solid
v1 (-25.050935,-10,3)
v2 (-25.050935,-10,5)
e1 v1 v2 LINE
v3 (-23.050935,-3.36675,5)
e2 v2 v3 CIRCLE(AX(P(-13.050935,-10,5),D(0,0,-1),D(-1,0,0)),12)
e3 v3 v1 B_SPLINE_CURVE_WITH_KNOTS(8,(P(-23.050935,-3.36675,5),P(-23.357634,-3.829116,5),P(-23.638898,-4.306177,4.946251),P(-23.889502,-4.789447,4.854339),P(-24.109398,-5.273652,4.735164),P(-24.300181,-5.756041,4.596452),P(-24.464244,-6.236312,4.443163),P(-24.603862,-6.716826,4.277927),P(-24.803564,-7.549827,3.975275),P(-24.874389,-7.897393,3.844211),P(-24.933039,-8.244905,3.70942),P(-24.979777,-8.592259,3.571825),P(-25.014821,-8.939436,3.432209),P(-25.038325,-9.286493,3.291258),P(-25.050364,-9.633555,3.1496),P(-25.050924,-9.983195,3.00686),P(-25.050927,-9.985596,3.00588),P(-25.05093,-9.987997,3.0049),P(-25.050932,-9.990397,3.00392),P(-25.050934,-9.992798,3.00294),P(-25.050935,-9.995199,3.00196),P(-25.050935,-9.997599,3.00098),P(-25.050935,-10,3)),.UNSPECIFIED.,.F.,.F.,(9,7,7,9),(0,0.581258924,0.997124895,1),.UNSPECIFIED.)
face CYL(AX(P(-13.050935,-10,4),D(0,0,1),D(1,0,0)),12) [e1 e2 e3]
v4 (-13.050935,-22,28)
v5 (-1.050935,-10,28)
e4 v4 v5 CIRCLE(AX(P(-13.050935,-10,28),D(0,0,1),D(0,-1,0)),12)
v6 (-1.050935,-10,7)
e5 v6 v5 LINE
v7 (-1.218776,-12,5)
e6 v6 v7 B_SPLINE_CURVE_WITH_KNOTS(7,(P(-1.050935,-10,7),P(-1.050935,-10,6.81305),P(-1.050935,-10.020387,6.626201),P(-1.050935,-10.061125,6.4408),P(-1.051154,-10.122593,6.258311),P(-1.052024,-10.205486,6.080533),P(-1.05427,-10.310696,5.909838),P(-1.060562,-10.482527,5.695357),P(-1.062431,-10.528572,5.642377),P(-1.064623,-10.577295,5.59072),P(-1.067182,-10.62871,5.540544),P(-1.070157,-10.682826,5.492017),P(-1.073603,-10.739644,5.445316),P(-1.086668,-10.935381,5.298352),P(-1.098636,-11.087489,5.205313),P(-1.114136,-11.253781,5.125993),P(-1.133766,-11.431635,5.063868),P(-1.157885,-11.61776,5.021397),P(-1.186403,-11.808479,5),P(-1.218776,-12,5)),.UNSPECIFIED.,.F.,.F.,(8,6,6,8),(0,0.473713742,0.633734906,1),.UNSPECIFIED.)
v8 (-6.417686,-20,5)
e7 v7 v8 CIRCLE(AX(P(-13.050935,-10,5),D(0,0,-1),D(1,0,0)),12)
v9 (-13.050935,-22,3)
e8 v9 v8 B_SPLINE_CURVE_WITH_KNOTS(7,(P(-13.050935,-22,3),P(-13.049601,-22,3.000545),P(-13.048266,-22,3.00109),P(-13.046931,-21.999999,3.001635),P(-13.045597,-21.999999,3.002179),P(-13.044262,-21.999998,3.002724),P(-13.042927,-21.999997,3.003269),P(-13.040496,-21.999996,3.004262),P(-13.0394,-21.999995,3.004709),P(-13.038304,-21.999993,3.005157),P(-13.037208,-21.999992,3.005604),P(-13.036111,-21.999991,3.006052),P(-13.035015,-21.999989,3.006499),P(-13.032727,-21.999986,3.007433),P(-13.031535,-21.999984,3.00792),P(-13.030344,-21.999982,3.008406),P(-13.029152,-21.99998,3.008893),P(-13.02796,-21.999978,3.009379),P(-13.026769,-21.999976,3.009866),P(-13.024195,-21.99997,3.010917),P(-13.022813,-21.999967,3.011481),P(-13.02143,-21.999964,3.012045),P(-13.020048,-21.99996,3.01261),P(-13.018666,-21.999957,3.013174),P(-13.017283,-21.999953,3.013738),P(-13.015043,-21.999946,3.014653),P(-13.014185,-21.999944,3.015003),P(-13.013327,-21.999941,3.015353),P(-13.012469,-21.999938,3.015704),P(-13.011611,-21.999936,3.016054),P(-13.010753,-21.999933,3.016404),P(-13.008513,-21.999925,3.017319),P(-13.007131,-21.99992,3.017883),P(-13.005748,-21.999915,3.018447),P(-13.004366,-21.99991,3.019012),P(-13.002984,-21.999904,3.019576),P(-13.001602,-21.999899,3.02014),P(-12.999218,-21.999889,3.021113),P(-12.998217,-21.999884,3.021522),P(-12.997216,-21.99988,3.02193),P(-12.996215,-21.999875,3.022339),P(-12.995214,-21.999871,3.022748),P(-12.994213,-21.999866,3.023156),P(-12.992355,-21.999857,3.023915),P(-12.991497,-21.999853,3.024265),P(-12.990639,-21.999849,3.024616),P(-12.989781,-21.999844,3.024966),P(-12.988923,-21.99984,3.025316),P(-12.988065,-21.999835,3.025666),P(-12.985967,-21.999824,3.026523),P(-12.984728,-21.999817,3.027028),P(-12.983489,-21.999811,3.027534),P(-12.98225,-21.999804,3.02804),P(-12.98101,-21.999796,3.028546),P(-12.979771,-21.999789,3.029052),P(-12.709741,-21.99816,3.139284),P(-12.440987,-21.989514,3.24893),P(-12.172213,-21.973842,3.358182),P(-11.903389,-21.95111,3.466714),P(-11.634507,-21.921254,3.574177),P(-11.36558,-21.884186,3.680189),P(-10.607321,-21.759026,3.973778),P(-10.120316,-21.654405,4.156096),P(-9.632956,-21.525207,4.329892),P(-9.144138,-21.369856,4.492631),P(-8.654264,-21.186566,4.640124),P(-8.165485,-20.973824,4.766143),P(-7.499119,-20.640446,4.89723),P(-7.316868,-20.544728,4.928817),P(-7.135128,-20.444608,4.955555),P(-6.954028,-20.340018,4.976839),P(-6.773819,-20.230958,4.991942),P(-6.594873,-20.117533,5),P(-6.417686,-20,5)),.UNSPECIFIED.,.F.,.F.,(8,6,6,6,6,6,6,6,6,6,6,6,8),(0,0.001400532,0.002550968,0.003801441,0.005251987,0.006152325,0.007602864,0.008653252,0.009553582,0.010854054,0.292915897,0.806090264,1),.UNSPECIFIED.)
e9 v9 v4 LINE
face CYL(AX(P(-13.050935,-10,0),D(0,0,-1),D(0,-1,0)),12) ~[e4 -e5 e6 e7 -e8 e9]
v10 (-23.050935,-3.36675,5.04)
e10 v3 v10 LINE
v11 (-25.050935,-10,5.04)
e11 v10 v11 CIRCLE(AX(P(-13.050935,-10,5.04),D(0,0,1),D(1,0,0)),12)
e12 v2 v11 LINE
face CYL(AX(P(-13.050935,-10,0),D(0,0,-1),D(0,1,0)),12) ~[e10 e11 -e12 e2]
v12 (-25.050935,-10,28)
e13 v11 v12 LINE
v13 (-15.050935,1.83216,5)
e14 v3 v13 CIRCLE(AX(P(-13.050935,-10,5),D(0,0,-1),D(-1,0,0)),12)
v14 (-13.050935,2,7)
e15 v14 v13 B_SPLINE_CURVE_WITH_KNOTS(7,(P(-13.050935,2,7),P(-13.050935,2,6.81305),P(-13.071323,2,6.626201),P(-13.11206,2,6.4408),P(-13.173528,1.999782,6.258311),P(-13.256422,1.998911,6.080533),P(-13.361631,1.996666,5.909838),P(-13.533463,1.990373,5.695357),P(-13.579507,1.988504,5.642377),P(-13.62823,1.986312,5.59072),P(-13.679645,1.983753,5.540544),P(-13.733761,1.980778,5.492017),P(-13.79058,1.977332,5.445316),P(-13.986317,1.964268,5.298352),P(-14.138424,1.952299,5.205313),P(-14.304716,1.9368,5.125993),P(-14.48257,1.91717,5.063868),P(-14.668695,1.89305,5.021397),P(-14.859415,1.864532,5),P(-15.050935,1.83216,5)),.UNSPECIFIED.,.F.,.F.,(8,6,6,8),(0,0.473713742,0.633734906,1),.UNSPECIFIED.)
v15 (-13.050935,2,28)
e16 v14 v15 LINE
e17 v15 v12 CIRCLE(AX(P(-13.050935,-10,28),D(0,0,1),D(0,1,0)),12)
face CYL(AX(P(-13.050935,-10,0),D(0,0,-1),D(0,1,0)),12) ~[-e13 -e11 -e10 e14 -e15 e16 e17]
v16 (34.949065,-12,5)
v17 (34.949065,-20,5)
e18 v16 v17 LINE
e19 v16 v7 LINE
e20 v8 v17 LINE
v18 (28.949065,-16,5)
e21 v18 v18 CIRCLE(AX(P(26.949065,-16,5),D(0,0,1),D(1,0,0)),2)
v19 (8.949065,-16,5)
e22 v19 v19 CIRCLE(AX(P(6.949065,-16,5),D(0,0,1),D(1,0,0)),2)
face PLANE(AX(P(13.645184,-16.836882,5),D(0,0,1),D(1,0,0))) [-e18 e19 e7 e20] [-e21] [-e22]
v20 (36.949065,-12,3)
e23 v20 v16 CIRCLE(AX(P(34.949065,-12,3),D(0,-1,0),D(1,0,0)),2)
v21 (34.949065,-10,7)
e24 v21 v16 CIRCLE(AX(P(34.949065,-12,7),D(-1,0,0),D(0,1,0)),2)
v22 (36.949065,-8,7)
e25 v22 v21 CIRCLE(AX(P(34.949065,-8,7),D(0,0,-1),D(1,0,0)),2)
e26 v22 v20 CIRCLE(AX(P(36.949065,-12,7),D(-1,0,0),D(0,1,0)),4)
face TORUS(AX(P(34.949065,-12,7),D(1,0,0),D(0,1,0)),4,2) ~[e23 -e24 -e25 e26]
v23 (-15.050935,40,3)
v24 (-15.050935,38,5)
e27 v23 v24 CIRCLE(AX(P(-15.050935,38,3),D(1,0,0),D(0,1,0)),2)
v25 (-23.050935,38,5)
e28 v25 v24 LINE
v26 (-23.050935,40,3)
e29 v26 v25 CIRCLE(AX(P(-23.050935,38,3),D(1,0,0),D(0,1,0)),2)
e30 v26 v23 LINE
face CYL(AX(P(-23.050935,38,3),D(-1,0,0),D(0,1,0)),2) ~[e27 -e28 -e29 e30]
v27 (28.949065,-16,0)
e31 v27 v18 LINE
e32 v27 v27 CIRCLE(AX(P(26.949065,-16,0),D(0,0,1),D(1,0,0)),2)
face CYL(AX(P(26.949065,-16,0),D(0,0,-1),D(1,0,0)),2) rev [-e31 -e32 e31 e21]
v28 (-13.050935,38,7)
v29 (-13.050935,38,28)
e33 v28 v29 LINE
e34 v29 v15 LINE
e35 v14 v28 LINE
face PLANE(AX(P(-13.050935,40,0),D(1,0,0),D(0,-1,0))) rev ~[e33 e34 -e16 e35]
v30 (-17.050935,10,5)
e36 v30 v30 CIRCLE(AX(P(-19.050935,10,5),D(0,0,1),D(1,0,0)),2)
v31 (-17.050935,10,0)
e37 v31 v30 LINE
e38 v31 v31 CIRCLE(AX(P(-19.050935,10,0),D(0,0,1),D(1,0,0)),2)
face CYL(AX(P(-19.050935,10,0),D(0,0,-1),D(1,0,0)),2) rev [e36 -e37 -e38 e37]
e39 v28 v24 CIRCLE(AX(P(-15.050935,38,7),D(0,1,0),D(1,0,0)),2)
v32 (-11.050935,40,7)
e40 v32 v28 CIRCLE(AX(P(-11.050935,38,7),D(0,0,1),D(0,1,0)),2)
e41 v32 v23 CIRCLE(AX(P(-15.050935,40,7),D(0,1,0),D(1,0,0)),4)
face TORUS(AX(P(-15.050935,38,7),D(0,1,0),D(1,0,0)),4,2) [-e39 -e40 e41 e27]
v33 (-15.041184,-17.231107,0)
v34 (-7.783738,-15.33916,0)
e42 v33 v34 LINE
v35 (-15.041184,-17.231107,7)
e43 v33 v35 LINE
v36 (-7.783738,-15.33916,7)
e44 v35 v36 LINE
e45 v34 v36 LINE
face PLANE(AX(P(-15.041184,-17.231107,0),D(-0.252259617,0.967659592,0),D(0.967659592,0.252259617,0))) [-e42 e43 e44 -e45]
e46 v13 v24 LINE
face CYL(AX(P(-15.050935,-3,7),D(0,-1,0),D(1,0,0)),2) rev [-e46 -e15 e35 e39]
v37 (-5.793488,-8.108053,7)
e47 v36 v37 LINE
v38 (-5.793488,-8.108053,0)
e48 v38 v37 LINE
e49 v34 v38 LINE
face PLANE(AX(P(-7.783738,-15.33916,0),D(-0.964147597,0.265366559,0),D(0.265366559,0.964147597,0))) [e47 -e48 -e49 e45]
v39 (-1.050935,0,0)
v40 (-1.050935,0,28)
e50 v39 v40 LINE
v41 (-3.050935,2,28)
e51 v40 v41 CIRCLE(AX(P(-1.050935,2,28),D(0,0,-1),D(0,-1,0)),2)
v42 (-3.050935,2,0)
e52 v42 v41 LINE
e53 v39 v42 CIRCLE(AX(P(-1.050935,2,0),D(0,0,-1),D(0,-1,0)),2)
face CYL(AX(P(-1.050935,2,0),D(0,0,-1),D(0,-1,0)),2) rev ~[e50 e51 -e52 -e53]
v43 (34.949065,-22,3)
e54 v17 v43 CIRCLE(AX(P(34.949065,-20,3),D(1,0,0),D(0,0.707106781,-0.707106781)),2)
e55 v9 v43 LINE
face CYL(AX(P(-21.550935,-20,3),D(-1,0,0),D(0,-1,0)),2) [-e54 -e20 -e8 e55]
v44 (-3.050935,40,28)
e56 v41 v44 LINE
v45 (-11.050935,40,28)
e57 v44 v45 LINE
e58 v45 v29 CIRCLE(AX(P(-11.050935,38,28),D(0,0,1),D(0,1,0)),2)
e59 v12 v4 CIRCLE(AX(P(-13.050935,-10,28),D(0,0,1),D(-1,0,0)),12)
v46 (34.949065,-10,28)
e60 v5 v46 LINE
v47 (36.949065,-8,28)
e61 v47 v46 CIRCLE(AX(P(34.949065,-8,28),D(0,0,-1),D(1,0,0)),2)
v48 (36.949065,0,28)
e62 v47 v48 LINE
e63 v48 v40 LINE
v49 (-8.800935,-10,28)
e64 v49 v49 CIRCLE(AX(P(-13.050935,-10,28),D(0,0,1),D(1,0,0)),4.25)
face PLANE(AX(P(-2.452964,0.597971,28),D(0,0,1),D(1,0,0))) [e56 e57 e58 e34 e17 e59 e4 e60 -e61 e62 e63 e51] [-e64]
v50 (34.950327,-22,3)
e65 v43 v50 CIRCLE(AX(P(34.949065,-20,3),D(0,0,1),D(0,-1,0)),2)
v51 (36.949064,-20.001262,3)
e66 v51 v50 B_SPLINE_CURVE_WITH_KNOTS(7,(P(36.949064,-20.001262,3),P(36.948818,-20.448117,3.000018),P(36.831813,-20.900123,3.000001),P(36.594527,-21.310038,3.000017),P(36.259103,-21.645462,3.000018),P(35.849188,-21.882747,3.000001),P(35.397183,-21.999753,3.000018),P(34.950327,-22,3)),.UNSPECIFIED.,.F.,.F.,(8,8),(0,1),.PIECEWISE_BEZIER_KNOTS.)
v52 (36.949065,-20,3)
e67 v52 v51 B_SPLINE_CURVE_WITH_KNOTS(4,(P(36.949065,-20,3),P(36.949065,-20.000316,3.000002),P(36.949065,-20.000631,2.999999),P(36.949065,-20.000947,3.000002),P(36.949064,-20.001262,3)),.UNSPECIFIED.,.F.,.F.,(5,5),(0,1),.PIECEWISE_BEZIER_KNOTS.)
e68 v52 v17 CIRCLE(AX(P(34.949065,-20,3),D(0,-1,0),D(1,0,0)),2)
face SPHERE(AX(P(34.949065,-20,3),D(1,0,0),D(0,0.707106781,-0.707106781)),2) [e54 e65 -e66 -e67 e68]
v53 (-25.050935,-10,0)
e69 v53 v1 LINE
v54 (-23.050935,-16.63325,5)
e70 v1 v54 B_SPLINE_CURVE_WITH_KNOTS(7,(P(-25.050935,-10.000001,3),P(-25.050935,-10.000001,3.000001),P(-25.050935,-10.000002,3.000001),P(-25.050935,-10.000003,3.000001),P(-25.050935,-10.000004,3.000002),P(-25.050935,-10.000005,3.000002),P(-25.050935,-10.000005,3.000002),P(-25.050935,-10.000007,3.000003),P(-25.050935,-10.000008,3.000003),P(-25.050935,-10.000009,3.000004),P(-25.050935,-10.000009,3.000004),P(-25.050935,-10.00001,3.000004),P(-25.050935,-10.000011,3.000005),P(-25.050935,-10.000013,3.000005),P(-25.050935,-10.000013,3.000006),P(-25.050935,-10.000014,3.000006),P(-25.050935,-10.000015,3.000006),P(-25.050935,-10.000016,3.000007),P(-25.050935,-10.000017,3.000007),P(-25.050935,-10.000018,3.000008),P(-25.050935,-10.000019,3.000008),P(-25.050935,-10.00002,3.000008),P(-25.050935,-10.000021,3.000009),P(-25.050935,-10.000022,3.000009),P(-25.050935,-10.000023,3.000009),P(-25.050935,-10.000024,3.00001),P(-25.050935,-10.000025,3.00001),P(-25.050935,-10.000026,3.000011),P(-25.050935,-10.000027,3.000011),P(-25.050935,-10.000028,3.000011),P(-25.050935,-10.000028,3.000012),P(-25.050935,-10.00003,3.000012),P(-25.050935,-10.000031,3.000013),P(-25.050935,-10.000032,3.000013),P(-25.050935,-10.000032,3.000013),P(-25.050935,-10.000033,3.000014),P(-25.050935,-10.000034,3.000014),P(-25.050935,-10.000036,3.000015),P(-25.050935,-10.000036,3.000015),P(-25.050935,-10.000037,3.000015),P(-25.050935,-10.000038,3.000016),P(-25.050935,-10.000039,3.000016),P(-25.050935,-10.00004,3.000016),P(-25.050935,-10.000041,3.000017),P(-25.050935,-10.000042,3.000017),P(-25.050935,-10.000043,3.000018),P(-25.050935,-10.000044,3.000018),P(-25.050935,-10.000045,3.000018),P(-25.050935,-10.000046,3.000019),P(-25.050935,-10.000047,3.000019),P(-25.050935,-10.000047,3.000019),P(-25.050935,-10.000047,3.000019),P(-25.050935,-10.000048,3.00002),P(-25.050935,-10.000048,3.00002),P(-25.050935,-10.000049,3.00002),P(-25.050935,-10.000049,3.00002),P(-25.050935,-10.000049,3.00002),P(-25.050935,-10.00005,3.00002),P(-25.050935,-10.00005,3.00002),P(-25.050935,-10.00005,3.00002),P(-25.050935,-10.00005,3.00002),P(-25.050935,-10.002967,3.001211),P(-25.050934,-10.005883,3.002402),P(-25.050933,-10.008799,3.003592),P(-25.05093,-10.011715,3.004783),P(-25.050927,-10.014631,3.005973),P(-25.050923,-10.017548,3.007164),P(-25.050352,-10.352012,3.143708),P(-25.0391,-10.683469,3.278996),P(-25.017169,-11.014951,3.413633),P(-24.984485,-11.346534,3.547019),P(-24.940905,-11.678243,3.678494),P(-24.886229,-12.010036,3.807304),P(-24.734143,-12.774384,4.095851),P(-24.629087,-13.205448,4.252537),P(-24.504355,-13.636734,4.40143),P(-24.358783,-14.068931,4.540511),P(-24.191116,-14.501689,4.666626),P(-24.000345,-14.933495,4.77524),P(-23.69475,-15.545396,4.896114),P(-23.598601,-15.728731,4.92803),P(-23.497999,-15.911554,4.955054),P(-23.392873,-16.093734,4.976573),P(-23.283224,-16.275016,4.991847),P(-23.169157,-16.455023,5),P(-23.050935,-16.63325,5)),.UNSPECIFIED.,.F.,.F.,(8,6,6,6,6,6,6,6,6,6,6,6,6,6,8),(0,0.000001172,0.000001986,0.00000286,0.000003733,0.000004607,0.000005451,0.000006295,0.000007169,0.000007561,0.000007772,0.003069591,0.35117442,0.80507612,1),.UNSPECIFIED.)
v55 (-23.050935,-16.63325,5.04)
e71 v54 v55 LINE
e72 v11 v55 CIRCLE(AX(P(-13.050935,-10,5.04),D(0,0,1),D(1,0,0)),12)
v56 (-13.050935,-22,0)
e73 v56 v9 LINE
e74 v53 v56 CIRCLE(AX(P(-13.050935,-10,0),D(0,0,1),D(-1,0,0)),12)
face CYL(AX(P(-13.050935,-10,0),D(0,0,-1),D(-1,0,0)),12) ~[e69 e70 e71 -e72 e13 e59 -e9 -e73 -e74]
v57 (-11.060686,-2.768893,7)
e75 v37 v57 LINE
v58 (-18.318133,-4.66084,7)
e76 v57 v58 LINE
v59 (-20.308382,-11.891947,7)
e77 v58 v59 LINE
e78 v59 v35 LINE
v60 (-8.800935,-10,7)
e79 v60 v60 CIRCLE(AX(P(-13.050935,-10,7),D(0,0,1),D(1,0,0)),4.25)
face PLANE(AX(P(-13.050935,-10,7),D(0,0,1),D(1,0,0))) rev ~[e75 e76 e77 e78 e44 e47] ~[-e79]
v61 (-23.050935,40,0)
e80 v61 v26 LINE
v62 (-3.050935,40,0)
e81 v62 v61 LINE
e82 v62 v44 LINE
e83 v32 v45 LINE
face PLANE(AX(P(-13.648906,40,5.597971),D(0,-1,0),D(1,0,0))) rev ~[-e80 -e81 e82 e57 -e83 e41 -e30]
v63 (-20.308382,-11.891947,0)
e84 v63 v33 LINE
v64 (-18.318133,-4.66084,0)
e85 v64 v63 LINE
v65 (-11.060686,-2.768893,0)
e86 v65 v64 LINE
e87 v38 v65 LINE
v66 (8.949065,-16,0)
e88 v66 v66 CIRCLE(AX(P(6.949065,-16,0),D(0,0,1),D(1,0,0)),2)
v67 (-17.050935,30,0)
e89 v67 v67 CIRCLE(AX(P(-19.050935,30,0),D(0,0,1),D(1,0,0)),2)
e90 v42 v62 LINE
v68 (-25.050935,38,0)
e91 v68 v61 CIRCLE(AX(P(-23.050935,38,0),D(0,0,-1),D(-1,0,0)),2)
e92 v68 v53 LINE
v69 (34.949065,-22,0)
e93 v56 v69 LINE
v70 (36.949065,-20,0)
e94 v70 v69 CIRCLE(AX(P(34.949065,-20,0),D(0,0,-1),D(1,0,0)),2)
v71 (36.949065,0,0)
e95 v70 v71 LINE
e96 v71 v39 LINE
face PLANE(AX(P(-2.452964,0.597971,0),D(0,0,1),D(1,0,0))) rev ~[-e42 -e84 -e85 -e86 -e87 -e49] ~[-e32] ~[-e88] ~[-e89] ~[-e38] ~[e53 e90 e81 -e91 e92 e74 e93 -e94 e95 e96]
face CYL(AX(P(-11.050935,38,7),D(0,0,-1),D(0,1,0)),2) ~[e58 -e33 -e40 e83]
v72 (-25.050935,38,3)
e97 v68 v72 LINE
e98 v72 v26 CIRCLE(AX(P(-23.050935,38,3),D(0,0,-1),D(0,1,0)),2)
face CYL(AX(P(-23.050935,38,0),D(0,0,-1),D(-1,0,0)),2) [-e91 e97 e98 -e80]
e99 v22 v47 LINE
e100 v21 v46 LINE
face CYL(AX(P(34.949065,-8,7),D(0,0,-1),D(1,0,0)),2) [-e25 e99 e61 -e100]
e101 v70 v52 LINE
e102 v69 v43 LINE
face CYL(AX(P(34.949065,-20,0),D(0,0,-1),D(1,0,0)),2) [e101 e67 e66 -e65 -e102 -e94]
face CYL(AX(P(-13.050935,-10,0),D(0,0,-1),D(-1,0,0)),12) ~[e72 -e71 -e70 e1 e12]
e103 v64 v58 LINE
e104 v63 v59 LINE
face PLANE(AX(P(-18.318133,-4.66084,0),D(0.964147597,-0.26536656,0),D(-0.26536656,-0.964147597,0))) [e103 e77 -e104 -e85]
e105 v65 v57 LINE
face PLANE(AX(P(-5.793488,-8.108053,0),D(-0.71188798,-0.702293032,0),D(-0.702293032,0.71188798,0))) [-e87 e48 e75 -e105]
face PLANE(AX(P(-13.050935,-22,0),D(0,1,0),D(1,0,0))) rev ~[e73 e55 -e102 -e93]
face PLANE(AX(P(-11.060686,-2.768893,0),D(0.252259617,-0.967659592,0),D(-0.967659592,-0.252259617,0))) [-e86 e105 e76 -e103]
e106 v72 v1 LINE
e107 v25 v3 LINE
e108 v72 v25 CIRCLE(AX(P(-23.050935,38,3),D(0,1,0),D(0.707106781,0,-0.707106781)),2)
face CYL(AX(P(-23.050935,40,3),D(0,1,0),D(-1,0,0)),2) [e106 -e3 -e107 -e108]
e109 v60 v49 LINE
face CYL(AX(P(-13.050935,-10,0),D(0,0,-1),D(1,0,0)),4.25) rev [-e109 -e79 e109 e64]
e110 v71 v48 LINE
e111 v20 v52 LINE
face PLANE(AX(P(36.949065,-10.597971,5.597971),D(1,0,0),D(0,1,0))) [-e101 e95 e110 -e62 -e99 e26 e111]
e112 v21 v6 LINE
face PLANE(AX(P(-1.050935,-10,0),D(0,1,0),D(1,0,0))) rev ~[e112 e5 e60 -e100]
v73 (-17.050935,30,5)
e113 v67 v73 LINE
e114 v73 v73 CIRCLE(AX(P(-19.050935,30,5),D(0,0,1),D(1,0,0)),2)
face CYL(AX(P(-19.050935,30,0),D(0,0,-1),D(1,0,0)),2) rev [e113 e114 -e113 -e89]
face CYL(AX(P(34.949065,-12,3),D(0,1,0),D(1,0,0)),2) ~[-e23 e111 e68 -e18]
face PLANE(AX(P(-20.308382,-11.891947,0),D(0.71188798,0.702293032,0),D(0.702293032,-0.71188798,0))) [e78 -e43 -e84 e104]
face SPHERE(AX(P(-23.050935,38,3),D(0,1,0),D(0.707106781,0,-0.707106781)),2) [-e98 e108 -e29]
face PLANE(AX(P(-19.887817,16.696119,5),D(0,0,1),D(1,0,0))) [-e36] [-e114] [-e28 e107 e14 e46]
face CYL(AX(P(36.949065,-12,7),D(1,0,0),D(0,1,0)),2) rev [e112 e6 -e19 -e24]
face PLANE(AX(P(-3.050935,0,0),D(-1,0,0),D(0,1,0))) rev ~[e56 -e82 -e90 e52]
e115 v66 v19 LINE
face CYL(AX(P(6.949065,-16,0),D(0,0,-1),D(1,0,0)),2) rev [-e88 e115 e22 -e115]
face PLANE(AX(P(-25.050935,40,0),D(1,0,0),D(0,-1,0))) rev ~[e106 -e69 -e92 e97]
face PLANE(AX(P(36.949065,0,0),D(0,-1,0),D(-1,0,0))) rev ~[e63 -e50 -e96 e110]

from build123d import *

# Parameters (mm, degrees)
F1_DEPTH     = 28
F0_R         = 2
F2_DEPTH     = 5
F3_DEPTH     = 5
F0_R_2       = 4.25
F4_DEPTH     = 28
F5_DEPTH     = 7
F6_T1_DEPTH  = 28
F6_T6_DEPTH  = 43
F6_S7_R      = 12
F6_T8_DEPTH  = 23
F6_T12_DEPTH = 43
F6_S13_R     = 12
F6_T14_DEPTH = 23
F6_T15_DEPTH = 5
F6_T20_DEPTH = 58.5
F6_S21_R     = 12
F6_T22_DEPTH = 31
F6_T26_DEPTH = 58.5
F6_S27_R     = 12
F6_T28_DEPTH = 31
F6_T33_DEPTH = 10
F6_T37_DEPTH = 63.5
F6_T44_DEPTH = 10
F6_T48_DEPTH = 63.5
F6_T51_DEPTH = 21
F6_T53_DEPTH = 8
F6_T55_DEPTH = 8
F6_S59_W     = 2.04
F6_S59_H     = 2.04
F6_T60_DEPTH = 2.04
F6_S65_W     = 2.04
F6_S65_H     = 2.04
F6_T66_DEPTH = 2.04
F6_T70_ANGLE = 90
F6_T72_ANGLE = 90


# Not quite as in the source:
# - a fillet or chamfer that OpenCascade refuses, or shapes differently, is made with other operations: its cross-section is extruded or revolved along the edge and cut away or added


with BuildPart() as f1:
    # F0 (on Top) → F1 (new body)
    with BuildSketch(Plane.XY):
        with BuildLine():
            Line((36.9490647506, 0), (-3.0509352494, 0))
            Line((-3.0509352494, 0), (-3.0509352494, 40))
            Line((-3.0509352494, 40), (-13.0509352494, 40))
            Line((-13.0509352494, 40), (-13.0509352494, 2))
            ThreePointArc((-13.0509352494, 2), (-21.5362166237, -1.5147186258), (-25.0509352494, -10))
            ThreePointArc((-25.0509352494, -10), (-21.5362166237, -18.4852813742), (-13.0509352494, -22))
            ThreePointArc((-13.0509352494, -22), (-4.5656538752, -18.4852813742), (-1.0509352494, -10))
            Line((-1.0509352494, -10), (36.9490647506, -10))
            Line((36.9490647506, -10), (36.9490647506, 0))
        make_face()
        Polygon((-5.7934883103, -8.1080528744), (-7.7837375065, -15.3391598531), (-15.0411844456, -17.2311069787), (-20.3083821886, -11.8919471256), (-18.3181329923, -4.6608401469), (-11.0606860532, -2.7688930213), align=None, mode=Mode.SUBTRACT)
    extrude(amount=F1_DEPTH)

    # F0 (on Top) → F2 (join)
    with BuildSketch(Plane.XY):
        with BuildLine():
            Line((-13.0509352494, 2), (-13.0509352494, 40))
            Line((-13.0509352494, 40), (-25.0509352494, 40))
            Line((-25.0509352494, 40), (-25.0509352494, -10))
            ThreePointArc((-25.0509352494, -10), (-21.5362166237, -1.5147186258), (-13.0509352494, 2))
        make_face()
        with Locations((-19.0509352494, 10)):
            Circle(F0_R, mode=Mode.SUBTRACT)
        with Locations((-19.0509352494, 30)):
            Circle(F0_R, mode=Mode.SUBTRACT)
    extrude(amount=F2_DEPTH)

    # F0 (on Top) → F3 (join)
    with BuildSketch(Plane.XY):
        with BuildLine():
            Line((36.9490647506, -22), (36.9490647506, -10))
            Line((36.9490647506, -10), (-1.0509352494, -10))
            ThreePointArc((-1.0509352494, -10), (-4.5656538752, -18.4852813742), (-13.0509352494, -22))
            Line((-13.0509352494, -22), (36.9490647506, -22))
        make_face()
        with Locations((6.9490647506, -16)):
            Circle(F0_R, mode=Mode.SUBTRACT)
        with Locations((26.9490647506, -16)):
            Circle(F0_R, mode=Mode.SUBTRACT)
    extrude(amount=F3_DEPTH)

    # F0 (on Top) → F4 (join)
    with BuildSketch(Plane.XY):
        Polygon((-15.0411844456, -17.2311069787), (-7.7837375065, -15.3391598531), (-5.7934883103, -8.1080528744), (-11.0606860532, -2.7688930213), (-18.3181329923, -4.6608401469), (-20.3083821886, -11.8919471256), align=None)
        with Locations((-13.0509352494, -10)):
            Circle(F0_R_2, mode=Mode.SUBTRACT)
    extrude(amount=F4_DEPTH)

    # F0 (on Top) → F5 (cut)
    with BuildSketch(Plane.XY):
        Polygon((-15.0411844456, -17.2311069787), (-7.7837375065, -15.3391598531), (-5.7934883103, -8.1080528744), (-11.0606860532, -2.7688930213), (-18.3181329923, -4.6608401469), (-20.3083821886, -11.8919471256), align=None)
        with Locations((-13.0509352494, -10)):
            Circle(F0_R_2, mode=Mode.SUBTRACT)
    extrude(amount=F5_DEPTH, mode=Mode.SUBTRACT)

    # F6: fillet of radius 2 on 11 edges, made by hand

    # F6_s2 → F6_t1 (join)
    with BuildSketch(Plane.XY):
        with BuildLine():
            ThreePointArc((-1.0509352494, 0), (-2.4651488118, 0.5857864376), (-3.0509352494, 2))
            Line((-3.0509352494, 2), (-3.0909352494, 2))
            Line((-3.0909352494, 2), (-3.0909352494, -0.04))
            Line((-3.0909352494, -0.04), (-1.0509352494, -0.04))
            Line((-1.0509352494, -0.04), (-1.0509352494, 0))
        make_face()
    extrude(amount=F6_T1_DEPTH)


with BuildPart() as f6_tool4:
    # F6_s5 → F6_t6 (new body)
    with BuildSketch(Plane.YZ.offset(36.9490647506)):
        with BuildLine():
            ThreePointArc((-10, 7), (-10.5857864376, 5.5857864376), (-12, 5))
            Line((-12, 5), (-12, 4.96))
            Line((-12, 4.96), (-9.96, 4.96))
            Line((-9.96, 4.96), (-9.96, 7))
            Line((-9.96, 7), (-10, 7))
        make_face()
    extrude(amount=-F6_T6_DEPTH)

    # F6_s7 → F6_t8 (cut, symmetric)
    with BuildSketch(Plane.XY.offset(6)):
        with Locations((-13.0509352494, -10)):
            Circle(F6_S7_R)
    extrude(amount=F6_T8_DEPTH, both=True, mode=Mode.SUBTRACT)


with BuildPart() as f1_1:
    add(f1.part)

    # F6_t3: union F6_tool4
    add(f6_tool4.part)


with BuildPart() as f6_tool10:
    # F6_s11 → F6_t12 (new body)
    with BuildSketch(Plane.XZ.offset(3)):
        with BuildLine():
            ThreePointArc((-13.0509352494, 7), (-13.6367216871, 5.5857864376), (-15.0509352494, 5))
            Line((-15.0509352494, 5), (-15.0509352494, 4.96))
            Line((-15.0509352494, 4.96), (-13.0109352494, 4.96))
            Line((-13.0109352494, 4.96), (-13.0109352494, 7))
            Line((-13.0109352494, 7), (-13.0509352494, 7))
        make_face()
    extrude(amount=-F6_T12_DEPTH)

    # F6_s13 → F6_t14 (cut, symmetric)
    with BuildSketch(Plane.XY.offset(6)):
        with Locations((-13.0509352494, -10)):
            Circle(F6_S13_R)
    extrude(amount=F6_T14_DEPTH, both=True, mode=Mode.SUBTRACT)


with BuildPart() as f1_2:
    add(f1_1.part)

    # F6_t9: union F6_tool10
    add(f6_tool10.part)

    # F6_s16 → F6_t15 (cut)
    with BuildSketch(Plane.XY):
        with BuildLine():
            ThreePointArc((36.9490647506, -20), (36.3632783129, -21.4142135624), (34.9490647506, -22))
            Line((34.9490647506, -22), (34.9490647506, -22.04))
            Line((34.9490647506, -22.04), (36.9890647506, -22.04))
            Line((36.9890647506, -22.04), (36.9890647506, -20))
            Line((36.9890647506, -20), (36.9490647506, -20))
        make_face()
        with BuildLine():
            ThreePointArc((-25.0509352494, 38), (-24.4651488118, 39.4142135624), (-23.0509352494, 40))
            Line((-23.0509352494, 40), (-23.0509352494, 40.04))
            Line((-23.0509352494, 40.04), (-25.0909352494, 40.04))
            Line((-25.0909352494, 40.04), (-25.0909352494, 38))
            Line((-25.0909352494, 38), (-25.0509352494, 38))
        make_face()
    extrude(amount=F6_T15_DEPTH, mode=Mode.SUBTRACT)


with BuildPart() as f6_tool18:
    # F6_s19 → F6_t20 (new body)
    with BuildSketch(Plane.YZ.offset(-21.5509352494)):
        with BuildLine():
            ThreePointArc((-22, 3), (-21.4142135624, 4.4142135624), (-20, 5))
            Line((-20, 5), (-20, 5.04))
            Line((-20, 5.04), (-22.04, 5.04))
            Line((-22.04, 5.04), (-22.04, 3))
            Line((-22.04, 3), (-22, 3))
        make_face()
    extrude(amount=F6_T20_DEPTH)

    # F6_s21 → F6_t22 (cut, symmetric)
    with BuildSketch(Plane.XY.offset(4)):
        with Locations((-13.0509352494, -10)):
            Circle(F6_S21_R)
    extrude(amount=F6_T22_DEPTH, both=True, mode=Mode.SUBTRACT)


with BuildPart() as f1_3:
    add(f1_2.part)

    # F6_t17: cut F6_tool18
    add(f6_tool18.part, mode=Mode.SUBTRACT)


with BuildPart() as f6_tool24:
    # F6_s25 → F6_t26 (new body)
    with BuildSketch(Plane.XZ.offset(-40)):
        with BuildLine():
            ThreePointArc((-25.0509352494, 3), (-24.4651488118, 4.4142135624), (-23.0509352494, 5))
            Line((-23.0509352494, 5), (-23.0509352494, 5.04))
            Line((-23.0509352494, 5.04), (-25.0909352494, 5.04))
            Line((-25.0909352494, 5.04), (-25.0909352494, 3))
            Line((-25.0909352494, 3), (-25.0509352494, 3))
        make_face()
    extrude(amount=F6_T26_DEPTH)

    # F6_s27 → F6_t28 (cut, symmetric)
    with BuildSketch(Plane.XY.offset(4)):
        with Locations((-13.0509352494, -10)):
            Circle(F6_S27_R)
    extrude(amount=F6_T28_DEPTH, both=True, mode=Mode.SUBTRACT)


with BuildPart() as f1_4:
    add(f1_3.part)

    # F6_t23: cut F6_tool24
    add(f6_tool24.part, mode=Mode.SUBTRACT)


with BuildPart() as f6_tool31:
    # F6_s32 → F6_t33 (new body)
    with BuildSketch(Plane.XY):
        with BuildLine():
            ThreePointArc((36.9490647506, -20), (36.3632783129, -21.4142135624), (34.9490647506, -22))
            Line((34.9490647506, -22), (34.9490647506, -22.04))
            Line((34.9490647506, -22.04), (36.9890647506, -22.04))
            Line((36.9890647506, -22.04), (36.9890647506, -20))
            Line((36.9890647506, -20), (36.9490647506, -20))
        make_face()
    extrude(amount=F6_T33_DEPTH)

    split(bisect_by=Plane.XY.offset(5), keep=Keep.TOP)


with BuildPart() as f6_tool35:
    # F6_s36 → F6_t37 (new body)
    with BuildSketch(Plane.YZ.offset(-21.5509352494)):
        with BuildLine():
            ThreePointArc((-22, 3), (-21.4142135624, 4.4142135624), (-20, 5))
            Line((-20, 5), (-20, 5.04))
            Line((-20, 5.04), (-22.04, 5.04))
            Line((-22.04, 5.04), (-22.04, 3))
            Line((-22.04, 3), (-22, 3))
        make_face()
    extrude(amount=F6_T37_DEPTH)

    split(bisect_by=Plane.YZ.offset(36.9490647506), keep=Keep.TOP)


with BuildPart() as f6_tool31_1:
    add(f6_tool31.part)

    # F6_t39: intersect F6_tool35
    add(f6_tool35.part, mode=Mode.INTERSECT)


with BuildPart() as f1_5:
    add(f1_4.part)

    # F6_t29: cut F6_tool31
    add(f6_tool31_1.part, mode=Mode.SUBTRACT)


with BuildPart() as f6_tool42:
    # F6_s43 → F6_t44 (new body)
    with BuildSketch(Plane.XY):
        with BuildLine():
            ThreePointArc((-25.0509352494, 38), (-24.4651488118, 39.4142135624), (-23.0509352494, 40))
            Line((-23.0509352494, 40), (-23.0509352494, 40.04))
            Line((-23.0509352494, 40.04), (-25.0909352494, 40.04))
            Line((-25.0909352494, 40.04), (-25.0909352494, 38))
            Line((-25.0909352494, 38), (-25.0509352494, 38))
        make_face()
    extrude(amount=F6_T44_DEPTH)

    split(bisect_by=Plane.XY.offset(5), keep=Keep.TOP)


with BuildPart() as f6_tool46:
    # F6_s47 → F6_t48 (new body)
    with BuildSketch(Plane.XZ.offset(-45)):
        with BuildLine():
            ThreePointArc((-25.0509352494, 3), (-24.4651488118, 4.4142135624), (-23.0509352494, 5))
            Line((-23.0509352494, 5), (-23.0509352494, 5.04))
            Line((-23.0509352494, 5.04), (-25.0909352494, 5.04))
            Line((-25.0909352494, 5.04), (-25.0909352494, 3))
            Line((-25.0909352494, 3), (-25.0509352494, 3))
        make_face()
    extrude(amount=F6_T48_DEPTH)

    split(bisect_by=Plane.XZ.offset(-40), keep=Keep.BOTTOM)


with BuildPart() as f6_tool42_1:
    add(f6_tool42.part)

    # F6_t50: intersect F6_tool46
    add(f6_tool46.part, mode=Mode.INTERSECT)


with BuildPart() as f1_6:
    add(f1_5.part)

    # F6_t40: cut F6_tool42
    add(f6_tool42_1.part, mode=Mode.SUBTRACT)

    # F6_s52 → F6_t51 (cut)
    with BuildSketch(Plane.XY.offset(7)):
        with BuildLine():
            ThreePointArc((36.9490647506, -8), (36.3632783129, -9.4142135624), (34.9490647506, -10))
            Line((34.9490647506, -10), (34.9490647506, -10.04))
            Line((34.9490647506, -10.04), (36.9890647506, -10.04))
            Line((36.9890647506, -10.04), (36.9890647506, -8))
            Line((36.9890647506, -8), (36.9490647506, -8))
        make_face()
        with BuildLine():
            ThreePointArc((-11.0509352494, 40), (-12.4651488118, 39.4142135624), (-13.0509352494, 38))
            Line((-13.0509352494, 38), (-13.0909352494, 38))
            Line((-13.0909352494, 38), (-13.0909352494, 40.04))
            Line((-13.0909352494, 40.04), (-11.0509352494, 40.04))
            Line((-11.0509352494, 40.04), (-11.0509352494, 40))
        make_face()
    extrude(amount=F6_T51_DEPTH, mode=Mode.SUBTRACT)

    # F6_s54 → F6_t53 (cut)
    with BuildSketch(Plane.XZ.offset(12)):
        with BuildLine():
            ThreePointArc((36.9490647506, 3), (36.3632783129, 4.4142135624), (34.9490647506, 5))
            Line((34.9490647506, 5), (34.9490647506, 5.04))
            Line((34.9490647506, 5.04), (36.9890647506, 5.04))
            Line((36.9890647506, 5.04), (36.9890647506, 3))
            Line((36.9890647506, 3), (36.9490647506, 3))
        make_face()
    extrude(amount=F6_T53_DEPTH, mode=Mode.SUBTRACT)

    # F6_s56 → F6_t55 (cut)
    with BuildSketch(Plane.YZ.offset(-23.0509352494)):
        with BuildLine():
            ThreePointArc((40, 3), (39.4142135624, 4.4142135624), (38, 5))
            Line((38, 5), (38, 5.04))
            Line((38, 5.04), (40.04, 5.04))
            Line((40.04, 5.04), (40.04, 3))
            Line((40.04, 3), (40, 3))
        make_face()
    extrude(amount=F6_T55_DEPTH, mode=Mode.SUBTRACT)


with BuildPart() as f6_tool58:
    # F6_s59 → F6_t60 (new body)
    with BuildSketch(Plane.XZ.offset(-38)):
        with Locations((-24.0709352494, 4.02)):
            Rectangle(F6_S59_W, F6_S59_H)
    extrude(amount=-F6_T60_DEPTH)

    # F6_s61 → F6_t62 (revolve, cut)
    with BuildSketch(Plane(origin=(-23.0509352494, 38, 3), x_dir=(0.7071067812, 0, -0.7071067812), z_dir=(0.7071067812, 0, 0.7071067812))):
        with BuildLine():
            ThreePointArc((0, -2), (2, 0), (0, 2))
            Line((0, 2), (0, -2))
        make_face()
    revolve(axis=Axis((-23.0509352494, 38, 3), (0, 1, 0)), mode=Mode.SUBTRACT)


with BuildPart() as f1_7:
    add(f1_6.part)

    # F6_t57: cut F6_tool58
    add(f6_tool58.part, mode=Mode.SUBTRACT)


with BuildPart() as f6_tool64:
    # F6_s65 → F6_t66 (new body)
    with BuildSketch(Plane.YZ.offset(34.9490647506)):
        with Locations((-21.02, 4.02)):
            Rectangle(F6_S65_W, F6_S65_H)
    extrude(amount=F6_T66_DEPTH)

    # F6_s67 → F6_t68 (revolve, cut)
    with BuildSketch(Plane(origin=(34.9490647506, -20, 3), x_dir=(0, 0.7071067812, -0.7071067812), z_dir=(0, -0.7071067812, -0.7071067812))):
        with BuildLine():
            ThreePointArc((0, -2), (2, 0), (0, 2))
            Line((0, 2), (0, -2))
        make_face()
    revolve(axis=Axis((34.9490647506, -20, 3), (1, 0, 0)), mode=Mode.SUBTRACT)


with BuildPart() as f1_8:
    add(f1_7.part)

    # F6_t63: cut F6_tool64
    add(f6_tool64.part, mode=Mode.SUBTRACT)

    # F6_s69 → F6_t70 (revolve, cut)
    with BuildSketch(Plane.XY.offset(7)):
        with BuildLine():
            ThreePointArc((-11.0509352494, 40), (-12.4651488118, 39.4142135624), (-13.0509352494, 38))
            Line((-13.0509352494, 38), (-13.0909352494, 38))
            Line((-13.0909352494, 38), (-13.0909352494, 40.04))
            Line((-13.0909352494, 40.04), (-11.0509352494, 40.04))
            Line((-11.0509352494, 40.04), (-11.0509352494, 40))
        make_face()
    revolve(axis=Axis((-15.0509352494, 40, 7), (0, 1, 0)), revolution_arc=F6_T70_ANGLE, mode=Mode.SUBTRACT)

    # F6_s71 → F6_t72 (revolve, cut)
    with BuildSketch(Plane.XY.offset(7)):
        with BuildLine():
            ThreePointArc((36.9490647506, -8), (36.3632783129, -9.4142135624), (34.9490647506, -10))
            Line((34.9490647506, -10), (34.9490647506, -10.04))
            Line((34.9490647506, -10.04), (36.9890647506, -10.04))
            Line((36.9890647506, -10.04), (36.9890647506, -8))
            Line((36.9890647506, -8), (36.9490647506, -8))
        make_face()
    revolve(axis=Axis((36.9490647506, -12, 7), (-1, 0, 0)), revolution_arc=F6_T72_ANGLE, mode=Mode.SUBTRACT)


solid = f1_8.part
